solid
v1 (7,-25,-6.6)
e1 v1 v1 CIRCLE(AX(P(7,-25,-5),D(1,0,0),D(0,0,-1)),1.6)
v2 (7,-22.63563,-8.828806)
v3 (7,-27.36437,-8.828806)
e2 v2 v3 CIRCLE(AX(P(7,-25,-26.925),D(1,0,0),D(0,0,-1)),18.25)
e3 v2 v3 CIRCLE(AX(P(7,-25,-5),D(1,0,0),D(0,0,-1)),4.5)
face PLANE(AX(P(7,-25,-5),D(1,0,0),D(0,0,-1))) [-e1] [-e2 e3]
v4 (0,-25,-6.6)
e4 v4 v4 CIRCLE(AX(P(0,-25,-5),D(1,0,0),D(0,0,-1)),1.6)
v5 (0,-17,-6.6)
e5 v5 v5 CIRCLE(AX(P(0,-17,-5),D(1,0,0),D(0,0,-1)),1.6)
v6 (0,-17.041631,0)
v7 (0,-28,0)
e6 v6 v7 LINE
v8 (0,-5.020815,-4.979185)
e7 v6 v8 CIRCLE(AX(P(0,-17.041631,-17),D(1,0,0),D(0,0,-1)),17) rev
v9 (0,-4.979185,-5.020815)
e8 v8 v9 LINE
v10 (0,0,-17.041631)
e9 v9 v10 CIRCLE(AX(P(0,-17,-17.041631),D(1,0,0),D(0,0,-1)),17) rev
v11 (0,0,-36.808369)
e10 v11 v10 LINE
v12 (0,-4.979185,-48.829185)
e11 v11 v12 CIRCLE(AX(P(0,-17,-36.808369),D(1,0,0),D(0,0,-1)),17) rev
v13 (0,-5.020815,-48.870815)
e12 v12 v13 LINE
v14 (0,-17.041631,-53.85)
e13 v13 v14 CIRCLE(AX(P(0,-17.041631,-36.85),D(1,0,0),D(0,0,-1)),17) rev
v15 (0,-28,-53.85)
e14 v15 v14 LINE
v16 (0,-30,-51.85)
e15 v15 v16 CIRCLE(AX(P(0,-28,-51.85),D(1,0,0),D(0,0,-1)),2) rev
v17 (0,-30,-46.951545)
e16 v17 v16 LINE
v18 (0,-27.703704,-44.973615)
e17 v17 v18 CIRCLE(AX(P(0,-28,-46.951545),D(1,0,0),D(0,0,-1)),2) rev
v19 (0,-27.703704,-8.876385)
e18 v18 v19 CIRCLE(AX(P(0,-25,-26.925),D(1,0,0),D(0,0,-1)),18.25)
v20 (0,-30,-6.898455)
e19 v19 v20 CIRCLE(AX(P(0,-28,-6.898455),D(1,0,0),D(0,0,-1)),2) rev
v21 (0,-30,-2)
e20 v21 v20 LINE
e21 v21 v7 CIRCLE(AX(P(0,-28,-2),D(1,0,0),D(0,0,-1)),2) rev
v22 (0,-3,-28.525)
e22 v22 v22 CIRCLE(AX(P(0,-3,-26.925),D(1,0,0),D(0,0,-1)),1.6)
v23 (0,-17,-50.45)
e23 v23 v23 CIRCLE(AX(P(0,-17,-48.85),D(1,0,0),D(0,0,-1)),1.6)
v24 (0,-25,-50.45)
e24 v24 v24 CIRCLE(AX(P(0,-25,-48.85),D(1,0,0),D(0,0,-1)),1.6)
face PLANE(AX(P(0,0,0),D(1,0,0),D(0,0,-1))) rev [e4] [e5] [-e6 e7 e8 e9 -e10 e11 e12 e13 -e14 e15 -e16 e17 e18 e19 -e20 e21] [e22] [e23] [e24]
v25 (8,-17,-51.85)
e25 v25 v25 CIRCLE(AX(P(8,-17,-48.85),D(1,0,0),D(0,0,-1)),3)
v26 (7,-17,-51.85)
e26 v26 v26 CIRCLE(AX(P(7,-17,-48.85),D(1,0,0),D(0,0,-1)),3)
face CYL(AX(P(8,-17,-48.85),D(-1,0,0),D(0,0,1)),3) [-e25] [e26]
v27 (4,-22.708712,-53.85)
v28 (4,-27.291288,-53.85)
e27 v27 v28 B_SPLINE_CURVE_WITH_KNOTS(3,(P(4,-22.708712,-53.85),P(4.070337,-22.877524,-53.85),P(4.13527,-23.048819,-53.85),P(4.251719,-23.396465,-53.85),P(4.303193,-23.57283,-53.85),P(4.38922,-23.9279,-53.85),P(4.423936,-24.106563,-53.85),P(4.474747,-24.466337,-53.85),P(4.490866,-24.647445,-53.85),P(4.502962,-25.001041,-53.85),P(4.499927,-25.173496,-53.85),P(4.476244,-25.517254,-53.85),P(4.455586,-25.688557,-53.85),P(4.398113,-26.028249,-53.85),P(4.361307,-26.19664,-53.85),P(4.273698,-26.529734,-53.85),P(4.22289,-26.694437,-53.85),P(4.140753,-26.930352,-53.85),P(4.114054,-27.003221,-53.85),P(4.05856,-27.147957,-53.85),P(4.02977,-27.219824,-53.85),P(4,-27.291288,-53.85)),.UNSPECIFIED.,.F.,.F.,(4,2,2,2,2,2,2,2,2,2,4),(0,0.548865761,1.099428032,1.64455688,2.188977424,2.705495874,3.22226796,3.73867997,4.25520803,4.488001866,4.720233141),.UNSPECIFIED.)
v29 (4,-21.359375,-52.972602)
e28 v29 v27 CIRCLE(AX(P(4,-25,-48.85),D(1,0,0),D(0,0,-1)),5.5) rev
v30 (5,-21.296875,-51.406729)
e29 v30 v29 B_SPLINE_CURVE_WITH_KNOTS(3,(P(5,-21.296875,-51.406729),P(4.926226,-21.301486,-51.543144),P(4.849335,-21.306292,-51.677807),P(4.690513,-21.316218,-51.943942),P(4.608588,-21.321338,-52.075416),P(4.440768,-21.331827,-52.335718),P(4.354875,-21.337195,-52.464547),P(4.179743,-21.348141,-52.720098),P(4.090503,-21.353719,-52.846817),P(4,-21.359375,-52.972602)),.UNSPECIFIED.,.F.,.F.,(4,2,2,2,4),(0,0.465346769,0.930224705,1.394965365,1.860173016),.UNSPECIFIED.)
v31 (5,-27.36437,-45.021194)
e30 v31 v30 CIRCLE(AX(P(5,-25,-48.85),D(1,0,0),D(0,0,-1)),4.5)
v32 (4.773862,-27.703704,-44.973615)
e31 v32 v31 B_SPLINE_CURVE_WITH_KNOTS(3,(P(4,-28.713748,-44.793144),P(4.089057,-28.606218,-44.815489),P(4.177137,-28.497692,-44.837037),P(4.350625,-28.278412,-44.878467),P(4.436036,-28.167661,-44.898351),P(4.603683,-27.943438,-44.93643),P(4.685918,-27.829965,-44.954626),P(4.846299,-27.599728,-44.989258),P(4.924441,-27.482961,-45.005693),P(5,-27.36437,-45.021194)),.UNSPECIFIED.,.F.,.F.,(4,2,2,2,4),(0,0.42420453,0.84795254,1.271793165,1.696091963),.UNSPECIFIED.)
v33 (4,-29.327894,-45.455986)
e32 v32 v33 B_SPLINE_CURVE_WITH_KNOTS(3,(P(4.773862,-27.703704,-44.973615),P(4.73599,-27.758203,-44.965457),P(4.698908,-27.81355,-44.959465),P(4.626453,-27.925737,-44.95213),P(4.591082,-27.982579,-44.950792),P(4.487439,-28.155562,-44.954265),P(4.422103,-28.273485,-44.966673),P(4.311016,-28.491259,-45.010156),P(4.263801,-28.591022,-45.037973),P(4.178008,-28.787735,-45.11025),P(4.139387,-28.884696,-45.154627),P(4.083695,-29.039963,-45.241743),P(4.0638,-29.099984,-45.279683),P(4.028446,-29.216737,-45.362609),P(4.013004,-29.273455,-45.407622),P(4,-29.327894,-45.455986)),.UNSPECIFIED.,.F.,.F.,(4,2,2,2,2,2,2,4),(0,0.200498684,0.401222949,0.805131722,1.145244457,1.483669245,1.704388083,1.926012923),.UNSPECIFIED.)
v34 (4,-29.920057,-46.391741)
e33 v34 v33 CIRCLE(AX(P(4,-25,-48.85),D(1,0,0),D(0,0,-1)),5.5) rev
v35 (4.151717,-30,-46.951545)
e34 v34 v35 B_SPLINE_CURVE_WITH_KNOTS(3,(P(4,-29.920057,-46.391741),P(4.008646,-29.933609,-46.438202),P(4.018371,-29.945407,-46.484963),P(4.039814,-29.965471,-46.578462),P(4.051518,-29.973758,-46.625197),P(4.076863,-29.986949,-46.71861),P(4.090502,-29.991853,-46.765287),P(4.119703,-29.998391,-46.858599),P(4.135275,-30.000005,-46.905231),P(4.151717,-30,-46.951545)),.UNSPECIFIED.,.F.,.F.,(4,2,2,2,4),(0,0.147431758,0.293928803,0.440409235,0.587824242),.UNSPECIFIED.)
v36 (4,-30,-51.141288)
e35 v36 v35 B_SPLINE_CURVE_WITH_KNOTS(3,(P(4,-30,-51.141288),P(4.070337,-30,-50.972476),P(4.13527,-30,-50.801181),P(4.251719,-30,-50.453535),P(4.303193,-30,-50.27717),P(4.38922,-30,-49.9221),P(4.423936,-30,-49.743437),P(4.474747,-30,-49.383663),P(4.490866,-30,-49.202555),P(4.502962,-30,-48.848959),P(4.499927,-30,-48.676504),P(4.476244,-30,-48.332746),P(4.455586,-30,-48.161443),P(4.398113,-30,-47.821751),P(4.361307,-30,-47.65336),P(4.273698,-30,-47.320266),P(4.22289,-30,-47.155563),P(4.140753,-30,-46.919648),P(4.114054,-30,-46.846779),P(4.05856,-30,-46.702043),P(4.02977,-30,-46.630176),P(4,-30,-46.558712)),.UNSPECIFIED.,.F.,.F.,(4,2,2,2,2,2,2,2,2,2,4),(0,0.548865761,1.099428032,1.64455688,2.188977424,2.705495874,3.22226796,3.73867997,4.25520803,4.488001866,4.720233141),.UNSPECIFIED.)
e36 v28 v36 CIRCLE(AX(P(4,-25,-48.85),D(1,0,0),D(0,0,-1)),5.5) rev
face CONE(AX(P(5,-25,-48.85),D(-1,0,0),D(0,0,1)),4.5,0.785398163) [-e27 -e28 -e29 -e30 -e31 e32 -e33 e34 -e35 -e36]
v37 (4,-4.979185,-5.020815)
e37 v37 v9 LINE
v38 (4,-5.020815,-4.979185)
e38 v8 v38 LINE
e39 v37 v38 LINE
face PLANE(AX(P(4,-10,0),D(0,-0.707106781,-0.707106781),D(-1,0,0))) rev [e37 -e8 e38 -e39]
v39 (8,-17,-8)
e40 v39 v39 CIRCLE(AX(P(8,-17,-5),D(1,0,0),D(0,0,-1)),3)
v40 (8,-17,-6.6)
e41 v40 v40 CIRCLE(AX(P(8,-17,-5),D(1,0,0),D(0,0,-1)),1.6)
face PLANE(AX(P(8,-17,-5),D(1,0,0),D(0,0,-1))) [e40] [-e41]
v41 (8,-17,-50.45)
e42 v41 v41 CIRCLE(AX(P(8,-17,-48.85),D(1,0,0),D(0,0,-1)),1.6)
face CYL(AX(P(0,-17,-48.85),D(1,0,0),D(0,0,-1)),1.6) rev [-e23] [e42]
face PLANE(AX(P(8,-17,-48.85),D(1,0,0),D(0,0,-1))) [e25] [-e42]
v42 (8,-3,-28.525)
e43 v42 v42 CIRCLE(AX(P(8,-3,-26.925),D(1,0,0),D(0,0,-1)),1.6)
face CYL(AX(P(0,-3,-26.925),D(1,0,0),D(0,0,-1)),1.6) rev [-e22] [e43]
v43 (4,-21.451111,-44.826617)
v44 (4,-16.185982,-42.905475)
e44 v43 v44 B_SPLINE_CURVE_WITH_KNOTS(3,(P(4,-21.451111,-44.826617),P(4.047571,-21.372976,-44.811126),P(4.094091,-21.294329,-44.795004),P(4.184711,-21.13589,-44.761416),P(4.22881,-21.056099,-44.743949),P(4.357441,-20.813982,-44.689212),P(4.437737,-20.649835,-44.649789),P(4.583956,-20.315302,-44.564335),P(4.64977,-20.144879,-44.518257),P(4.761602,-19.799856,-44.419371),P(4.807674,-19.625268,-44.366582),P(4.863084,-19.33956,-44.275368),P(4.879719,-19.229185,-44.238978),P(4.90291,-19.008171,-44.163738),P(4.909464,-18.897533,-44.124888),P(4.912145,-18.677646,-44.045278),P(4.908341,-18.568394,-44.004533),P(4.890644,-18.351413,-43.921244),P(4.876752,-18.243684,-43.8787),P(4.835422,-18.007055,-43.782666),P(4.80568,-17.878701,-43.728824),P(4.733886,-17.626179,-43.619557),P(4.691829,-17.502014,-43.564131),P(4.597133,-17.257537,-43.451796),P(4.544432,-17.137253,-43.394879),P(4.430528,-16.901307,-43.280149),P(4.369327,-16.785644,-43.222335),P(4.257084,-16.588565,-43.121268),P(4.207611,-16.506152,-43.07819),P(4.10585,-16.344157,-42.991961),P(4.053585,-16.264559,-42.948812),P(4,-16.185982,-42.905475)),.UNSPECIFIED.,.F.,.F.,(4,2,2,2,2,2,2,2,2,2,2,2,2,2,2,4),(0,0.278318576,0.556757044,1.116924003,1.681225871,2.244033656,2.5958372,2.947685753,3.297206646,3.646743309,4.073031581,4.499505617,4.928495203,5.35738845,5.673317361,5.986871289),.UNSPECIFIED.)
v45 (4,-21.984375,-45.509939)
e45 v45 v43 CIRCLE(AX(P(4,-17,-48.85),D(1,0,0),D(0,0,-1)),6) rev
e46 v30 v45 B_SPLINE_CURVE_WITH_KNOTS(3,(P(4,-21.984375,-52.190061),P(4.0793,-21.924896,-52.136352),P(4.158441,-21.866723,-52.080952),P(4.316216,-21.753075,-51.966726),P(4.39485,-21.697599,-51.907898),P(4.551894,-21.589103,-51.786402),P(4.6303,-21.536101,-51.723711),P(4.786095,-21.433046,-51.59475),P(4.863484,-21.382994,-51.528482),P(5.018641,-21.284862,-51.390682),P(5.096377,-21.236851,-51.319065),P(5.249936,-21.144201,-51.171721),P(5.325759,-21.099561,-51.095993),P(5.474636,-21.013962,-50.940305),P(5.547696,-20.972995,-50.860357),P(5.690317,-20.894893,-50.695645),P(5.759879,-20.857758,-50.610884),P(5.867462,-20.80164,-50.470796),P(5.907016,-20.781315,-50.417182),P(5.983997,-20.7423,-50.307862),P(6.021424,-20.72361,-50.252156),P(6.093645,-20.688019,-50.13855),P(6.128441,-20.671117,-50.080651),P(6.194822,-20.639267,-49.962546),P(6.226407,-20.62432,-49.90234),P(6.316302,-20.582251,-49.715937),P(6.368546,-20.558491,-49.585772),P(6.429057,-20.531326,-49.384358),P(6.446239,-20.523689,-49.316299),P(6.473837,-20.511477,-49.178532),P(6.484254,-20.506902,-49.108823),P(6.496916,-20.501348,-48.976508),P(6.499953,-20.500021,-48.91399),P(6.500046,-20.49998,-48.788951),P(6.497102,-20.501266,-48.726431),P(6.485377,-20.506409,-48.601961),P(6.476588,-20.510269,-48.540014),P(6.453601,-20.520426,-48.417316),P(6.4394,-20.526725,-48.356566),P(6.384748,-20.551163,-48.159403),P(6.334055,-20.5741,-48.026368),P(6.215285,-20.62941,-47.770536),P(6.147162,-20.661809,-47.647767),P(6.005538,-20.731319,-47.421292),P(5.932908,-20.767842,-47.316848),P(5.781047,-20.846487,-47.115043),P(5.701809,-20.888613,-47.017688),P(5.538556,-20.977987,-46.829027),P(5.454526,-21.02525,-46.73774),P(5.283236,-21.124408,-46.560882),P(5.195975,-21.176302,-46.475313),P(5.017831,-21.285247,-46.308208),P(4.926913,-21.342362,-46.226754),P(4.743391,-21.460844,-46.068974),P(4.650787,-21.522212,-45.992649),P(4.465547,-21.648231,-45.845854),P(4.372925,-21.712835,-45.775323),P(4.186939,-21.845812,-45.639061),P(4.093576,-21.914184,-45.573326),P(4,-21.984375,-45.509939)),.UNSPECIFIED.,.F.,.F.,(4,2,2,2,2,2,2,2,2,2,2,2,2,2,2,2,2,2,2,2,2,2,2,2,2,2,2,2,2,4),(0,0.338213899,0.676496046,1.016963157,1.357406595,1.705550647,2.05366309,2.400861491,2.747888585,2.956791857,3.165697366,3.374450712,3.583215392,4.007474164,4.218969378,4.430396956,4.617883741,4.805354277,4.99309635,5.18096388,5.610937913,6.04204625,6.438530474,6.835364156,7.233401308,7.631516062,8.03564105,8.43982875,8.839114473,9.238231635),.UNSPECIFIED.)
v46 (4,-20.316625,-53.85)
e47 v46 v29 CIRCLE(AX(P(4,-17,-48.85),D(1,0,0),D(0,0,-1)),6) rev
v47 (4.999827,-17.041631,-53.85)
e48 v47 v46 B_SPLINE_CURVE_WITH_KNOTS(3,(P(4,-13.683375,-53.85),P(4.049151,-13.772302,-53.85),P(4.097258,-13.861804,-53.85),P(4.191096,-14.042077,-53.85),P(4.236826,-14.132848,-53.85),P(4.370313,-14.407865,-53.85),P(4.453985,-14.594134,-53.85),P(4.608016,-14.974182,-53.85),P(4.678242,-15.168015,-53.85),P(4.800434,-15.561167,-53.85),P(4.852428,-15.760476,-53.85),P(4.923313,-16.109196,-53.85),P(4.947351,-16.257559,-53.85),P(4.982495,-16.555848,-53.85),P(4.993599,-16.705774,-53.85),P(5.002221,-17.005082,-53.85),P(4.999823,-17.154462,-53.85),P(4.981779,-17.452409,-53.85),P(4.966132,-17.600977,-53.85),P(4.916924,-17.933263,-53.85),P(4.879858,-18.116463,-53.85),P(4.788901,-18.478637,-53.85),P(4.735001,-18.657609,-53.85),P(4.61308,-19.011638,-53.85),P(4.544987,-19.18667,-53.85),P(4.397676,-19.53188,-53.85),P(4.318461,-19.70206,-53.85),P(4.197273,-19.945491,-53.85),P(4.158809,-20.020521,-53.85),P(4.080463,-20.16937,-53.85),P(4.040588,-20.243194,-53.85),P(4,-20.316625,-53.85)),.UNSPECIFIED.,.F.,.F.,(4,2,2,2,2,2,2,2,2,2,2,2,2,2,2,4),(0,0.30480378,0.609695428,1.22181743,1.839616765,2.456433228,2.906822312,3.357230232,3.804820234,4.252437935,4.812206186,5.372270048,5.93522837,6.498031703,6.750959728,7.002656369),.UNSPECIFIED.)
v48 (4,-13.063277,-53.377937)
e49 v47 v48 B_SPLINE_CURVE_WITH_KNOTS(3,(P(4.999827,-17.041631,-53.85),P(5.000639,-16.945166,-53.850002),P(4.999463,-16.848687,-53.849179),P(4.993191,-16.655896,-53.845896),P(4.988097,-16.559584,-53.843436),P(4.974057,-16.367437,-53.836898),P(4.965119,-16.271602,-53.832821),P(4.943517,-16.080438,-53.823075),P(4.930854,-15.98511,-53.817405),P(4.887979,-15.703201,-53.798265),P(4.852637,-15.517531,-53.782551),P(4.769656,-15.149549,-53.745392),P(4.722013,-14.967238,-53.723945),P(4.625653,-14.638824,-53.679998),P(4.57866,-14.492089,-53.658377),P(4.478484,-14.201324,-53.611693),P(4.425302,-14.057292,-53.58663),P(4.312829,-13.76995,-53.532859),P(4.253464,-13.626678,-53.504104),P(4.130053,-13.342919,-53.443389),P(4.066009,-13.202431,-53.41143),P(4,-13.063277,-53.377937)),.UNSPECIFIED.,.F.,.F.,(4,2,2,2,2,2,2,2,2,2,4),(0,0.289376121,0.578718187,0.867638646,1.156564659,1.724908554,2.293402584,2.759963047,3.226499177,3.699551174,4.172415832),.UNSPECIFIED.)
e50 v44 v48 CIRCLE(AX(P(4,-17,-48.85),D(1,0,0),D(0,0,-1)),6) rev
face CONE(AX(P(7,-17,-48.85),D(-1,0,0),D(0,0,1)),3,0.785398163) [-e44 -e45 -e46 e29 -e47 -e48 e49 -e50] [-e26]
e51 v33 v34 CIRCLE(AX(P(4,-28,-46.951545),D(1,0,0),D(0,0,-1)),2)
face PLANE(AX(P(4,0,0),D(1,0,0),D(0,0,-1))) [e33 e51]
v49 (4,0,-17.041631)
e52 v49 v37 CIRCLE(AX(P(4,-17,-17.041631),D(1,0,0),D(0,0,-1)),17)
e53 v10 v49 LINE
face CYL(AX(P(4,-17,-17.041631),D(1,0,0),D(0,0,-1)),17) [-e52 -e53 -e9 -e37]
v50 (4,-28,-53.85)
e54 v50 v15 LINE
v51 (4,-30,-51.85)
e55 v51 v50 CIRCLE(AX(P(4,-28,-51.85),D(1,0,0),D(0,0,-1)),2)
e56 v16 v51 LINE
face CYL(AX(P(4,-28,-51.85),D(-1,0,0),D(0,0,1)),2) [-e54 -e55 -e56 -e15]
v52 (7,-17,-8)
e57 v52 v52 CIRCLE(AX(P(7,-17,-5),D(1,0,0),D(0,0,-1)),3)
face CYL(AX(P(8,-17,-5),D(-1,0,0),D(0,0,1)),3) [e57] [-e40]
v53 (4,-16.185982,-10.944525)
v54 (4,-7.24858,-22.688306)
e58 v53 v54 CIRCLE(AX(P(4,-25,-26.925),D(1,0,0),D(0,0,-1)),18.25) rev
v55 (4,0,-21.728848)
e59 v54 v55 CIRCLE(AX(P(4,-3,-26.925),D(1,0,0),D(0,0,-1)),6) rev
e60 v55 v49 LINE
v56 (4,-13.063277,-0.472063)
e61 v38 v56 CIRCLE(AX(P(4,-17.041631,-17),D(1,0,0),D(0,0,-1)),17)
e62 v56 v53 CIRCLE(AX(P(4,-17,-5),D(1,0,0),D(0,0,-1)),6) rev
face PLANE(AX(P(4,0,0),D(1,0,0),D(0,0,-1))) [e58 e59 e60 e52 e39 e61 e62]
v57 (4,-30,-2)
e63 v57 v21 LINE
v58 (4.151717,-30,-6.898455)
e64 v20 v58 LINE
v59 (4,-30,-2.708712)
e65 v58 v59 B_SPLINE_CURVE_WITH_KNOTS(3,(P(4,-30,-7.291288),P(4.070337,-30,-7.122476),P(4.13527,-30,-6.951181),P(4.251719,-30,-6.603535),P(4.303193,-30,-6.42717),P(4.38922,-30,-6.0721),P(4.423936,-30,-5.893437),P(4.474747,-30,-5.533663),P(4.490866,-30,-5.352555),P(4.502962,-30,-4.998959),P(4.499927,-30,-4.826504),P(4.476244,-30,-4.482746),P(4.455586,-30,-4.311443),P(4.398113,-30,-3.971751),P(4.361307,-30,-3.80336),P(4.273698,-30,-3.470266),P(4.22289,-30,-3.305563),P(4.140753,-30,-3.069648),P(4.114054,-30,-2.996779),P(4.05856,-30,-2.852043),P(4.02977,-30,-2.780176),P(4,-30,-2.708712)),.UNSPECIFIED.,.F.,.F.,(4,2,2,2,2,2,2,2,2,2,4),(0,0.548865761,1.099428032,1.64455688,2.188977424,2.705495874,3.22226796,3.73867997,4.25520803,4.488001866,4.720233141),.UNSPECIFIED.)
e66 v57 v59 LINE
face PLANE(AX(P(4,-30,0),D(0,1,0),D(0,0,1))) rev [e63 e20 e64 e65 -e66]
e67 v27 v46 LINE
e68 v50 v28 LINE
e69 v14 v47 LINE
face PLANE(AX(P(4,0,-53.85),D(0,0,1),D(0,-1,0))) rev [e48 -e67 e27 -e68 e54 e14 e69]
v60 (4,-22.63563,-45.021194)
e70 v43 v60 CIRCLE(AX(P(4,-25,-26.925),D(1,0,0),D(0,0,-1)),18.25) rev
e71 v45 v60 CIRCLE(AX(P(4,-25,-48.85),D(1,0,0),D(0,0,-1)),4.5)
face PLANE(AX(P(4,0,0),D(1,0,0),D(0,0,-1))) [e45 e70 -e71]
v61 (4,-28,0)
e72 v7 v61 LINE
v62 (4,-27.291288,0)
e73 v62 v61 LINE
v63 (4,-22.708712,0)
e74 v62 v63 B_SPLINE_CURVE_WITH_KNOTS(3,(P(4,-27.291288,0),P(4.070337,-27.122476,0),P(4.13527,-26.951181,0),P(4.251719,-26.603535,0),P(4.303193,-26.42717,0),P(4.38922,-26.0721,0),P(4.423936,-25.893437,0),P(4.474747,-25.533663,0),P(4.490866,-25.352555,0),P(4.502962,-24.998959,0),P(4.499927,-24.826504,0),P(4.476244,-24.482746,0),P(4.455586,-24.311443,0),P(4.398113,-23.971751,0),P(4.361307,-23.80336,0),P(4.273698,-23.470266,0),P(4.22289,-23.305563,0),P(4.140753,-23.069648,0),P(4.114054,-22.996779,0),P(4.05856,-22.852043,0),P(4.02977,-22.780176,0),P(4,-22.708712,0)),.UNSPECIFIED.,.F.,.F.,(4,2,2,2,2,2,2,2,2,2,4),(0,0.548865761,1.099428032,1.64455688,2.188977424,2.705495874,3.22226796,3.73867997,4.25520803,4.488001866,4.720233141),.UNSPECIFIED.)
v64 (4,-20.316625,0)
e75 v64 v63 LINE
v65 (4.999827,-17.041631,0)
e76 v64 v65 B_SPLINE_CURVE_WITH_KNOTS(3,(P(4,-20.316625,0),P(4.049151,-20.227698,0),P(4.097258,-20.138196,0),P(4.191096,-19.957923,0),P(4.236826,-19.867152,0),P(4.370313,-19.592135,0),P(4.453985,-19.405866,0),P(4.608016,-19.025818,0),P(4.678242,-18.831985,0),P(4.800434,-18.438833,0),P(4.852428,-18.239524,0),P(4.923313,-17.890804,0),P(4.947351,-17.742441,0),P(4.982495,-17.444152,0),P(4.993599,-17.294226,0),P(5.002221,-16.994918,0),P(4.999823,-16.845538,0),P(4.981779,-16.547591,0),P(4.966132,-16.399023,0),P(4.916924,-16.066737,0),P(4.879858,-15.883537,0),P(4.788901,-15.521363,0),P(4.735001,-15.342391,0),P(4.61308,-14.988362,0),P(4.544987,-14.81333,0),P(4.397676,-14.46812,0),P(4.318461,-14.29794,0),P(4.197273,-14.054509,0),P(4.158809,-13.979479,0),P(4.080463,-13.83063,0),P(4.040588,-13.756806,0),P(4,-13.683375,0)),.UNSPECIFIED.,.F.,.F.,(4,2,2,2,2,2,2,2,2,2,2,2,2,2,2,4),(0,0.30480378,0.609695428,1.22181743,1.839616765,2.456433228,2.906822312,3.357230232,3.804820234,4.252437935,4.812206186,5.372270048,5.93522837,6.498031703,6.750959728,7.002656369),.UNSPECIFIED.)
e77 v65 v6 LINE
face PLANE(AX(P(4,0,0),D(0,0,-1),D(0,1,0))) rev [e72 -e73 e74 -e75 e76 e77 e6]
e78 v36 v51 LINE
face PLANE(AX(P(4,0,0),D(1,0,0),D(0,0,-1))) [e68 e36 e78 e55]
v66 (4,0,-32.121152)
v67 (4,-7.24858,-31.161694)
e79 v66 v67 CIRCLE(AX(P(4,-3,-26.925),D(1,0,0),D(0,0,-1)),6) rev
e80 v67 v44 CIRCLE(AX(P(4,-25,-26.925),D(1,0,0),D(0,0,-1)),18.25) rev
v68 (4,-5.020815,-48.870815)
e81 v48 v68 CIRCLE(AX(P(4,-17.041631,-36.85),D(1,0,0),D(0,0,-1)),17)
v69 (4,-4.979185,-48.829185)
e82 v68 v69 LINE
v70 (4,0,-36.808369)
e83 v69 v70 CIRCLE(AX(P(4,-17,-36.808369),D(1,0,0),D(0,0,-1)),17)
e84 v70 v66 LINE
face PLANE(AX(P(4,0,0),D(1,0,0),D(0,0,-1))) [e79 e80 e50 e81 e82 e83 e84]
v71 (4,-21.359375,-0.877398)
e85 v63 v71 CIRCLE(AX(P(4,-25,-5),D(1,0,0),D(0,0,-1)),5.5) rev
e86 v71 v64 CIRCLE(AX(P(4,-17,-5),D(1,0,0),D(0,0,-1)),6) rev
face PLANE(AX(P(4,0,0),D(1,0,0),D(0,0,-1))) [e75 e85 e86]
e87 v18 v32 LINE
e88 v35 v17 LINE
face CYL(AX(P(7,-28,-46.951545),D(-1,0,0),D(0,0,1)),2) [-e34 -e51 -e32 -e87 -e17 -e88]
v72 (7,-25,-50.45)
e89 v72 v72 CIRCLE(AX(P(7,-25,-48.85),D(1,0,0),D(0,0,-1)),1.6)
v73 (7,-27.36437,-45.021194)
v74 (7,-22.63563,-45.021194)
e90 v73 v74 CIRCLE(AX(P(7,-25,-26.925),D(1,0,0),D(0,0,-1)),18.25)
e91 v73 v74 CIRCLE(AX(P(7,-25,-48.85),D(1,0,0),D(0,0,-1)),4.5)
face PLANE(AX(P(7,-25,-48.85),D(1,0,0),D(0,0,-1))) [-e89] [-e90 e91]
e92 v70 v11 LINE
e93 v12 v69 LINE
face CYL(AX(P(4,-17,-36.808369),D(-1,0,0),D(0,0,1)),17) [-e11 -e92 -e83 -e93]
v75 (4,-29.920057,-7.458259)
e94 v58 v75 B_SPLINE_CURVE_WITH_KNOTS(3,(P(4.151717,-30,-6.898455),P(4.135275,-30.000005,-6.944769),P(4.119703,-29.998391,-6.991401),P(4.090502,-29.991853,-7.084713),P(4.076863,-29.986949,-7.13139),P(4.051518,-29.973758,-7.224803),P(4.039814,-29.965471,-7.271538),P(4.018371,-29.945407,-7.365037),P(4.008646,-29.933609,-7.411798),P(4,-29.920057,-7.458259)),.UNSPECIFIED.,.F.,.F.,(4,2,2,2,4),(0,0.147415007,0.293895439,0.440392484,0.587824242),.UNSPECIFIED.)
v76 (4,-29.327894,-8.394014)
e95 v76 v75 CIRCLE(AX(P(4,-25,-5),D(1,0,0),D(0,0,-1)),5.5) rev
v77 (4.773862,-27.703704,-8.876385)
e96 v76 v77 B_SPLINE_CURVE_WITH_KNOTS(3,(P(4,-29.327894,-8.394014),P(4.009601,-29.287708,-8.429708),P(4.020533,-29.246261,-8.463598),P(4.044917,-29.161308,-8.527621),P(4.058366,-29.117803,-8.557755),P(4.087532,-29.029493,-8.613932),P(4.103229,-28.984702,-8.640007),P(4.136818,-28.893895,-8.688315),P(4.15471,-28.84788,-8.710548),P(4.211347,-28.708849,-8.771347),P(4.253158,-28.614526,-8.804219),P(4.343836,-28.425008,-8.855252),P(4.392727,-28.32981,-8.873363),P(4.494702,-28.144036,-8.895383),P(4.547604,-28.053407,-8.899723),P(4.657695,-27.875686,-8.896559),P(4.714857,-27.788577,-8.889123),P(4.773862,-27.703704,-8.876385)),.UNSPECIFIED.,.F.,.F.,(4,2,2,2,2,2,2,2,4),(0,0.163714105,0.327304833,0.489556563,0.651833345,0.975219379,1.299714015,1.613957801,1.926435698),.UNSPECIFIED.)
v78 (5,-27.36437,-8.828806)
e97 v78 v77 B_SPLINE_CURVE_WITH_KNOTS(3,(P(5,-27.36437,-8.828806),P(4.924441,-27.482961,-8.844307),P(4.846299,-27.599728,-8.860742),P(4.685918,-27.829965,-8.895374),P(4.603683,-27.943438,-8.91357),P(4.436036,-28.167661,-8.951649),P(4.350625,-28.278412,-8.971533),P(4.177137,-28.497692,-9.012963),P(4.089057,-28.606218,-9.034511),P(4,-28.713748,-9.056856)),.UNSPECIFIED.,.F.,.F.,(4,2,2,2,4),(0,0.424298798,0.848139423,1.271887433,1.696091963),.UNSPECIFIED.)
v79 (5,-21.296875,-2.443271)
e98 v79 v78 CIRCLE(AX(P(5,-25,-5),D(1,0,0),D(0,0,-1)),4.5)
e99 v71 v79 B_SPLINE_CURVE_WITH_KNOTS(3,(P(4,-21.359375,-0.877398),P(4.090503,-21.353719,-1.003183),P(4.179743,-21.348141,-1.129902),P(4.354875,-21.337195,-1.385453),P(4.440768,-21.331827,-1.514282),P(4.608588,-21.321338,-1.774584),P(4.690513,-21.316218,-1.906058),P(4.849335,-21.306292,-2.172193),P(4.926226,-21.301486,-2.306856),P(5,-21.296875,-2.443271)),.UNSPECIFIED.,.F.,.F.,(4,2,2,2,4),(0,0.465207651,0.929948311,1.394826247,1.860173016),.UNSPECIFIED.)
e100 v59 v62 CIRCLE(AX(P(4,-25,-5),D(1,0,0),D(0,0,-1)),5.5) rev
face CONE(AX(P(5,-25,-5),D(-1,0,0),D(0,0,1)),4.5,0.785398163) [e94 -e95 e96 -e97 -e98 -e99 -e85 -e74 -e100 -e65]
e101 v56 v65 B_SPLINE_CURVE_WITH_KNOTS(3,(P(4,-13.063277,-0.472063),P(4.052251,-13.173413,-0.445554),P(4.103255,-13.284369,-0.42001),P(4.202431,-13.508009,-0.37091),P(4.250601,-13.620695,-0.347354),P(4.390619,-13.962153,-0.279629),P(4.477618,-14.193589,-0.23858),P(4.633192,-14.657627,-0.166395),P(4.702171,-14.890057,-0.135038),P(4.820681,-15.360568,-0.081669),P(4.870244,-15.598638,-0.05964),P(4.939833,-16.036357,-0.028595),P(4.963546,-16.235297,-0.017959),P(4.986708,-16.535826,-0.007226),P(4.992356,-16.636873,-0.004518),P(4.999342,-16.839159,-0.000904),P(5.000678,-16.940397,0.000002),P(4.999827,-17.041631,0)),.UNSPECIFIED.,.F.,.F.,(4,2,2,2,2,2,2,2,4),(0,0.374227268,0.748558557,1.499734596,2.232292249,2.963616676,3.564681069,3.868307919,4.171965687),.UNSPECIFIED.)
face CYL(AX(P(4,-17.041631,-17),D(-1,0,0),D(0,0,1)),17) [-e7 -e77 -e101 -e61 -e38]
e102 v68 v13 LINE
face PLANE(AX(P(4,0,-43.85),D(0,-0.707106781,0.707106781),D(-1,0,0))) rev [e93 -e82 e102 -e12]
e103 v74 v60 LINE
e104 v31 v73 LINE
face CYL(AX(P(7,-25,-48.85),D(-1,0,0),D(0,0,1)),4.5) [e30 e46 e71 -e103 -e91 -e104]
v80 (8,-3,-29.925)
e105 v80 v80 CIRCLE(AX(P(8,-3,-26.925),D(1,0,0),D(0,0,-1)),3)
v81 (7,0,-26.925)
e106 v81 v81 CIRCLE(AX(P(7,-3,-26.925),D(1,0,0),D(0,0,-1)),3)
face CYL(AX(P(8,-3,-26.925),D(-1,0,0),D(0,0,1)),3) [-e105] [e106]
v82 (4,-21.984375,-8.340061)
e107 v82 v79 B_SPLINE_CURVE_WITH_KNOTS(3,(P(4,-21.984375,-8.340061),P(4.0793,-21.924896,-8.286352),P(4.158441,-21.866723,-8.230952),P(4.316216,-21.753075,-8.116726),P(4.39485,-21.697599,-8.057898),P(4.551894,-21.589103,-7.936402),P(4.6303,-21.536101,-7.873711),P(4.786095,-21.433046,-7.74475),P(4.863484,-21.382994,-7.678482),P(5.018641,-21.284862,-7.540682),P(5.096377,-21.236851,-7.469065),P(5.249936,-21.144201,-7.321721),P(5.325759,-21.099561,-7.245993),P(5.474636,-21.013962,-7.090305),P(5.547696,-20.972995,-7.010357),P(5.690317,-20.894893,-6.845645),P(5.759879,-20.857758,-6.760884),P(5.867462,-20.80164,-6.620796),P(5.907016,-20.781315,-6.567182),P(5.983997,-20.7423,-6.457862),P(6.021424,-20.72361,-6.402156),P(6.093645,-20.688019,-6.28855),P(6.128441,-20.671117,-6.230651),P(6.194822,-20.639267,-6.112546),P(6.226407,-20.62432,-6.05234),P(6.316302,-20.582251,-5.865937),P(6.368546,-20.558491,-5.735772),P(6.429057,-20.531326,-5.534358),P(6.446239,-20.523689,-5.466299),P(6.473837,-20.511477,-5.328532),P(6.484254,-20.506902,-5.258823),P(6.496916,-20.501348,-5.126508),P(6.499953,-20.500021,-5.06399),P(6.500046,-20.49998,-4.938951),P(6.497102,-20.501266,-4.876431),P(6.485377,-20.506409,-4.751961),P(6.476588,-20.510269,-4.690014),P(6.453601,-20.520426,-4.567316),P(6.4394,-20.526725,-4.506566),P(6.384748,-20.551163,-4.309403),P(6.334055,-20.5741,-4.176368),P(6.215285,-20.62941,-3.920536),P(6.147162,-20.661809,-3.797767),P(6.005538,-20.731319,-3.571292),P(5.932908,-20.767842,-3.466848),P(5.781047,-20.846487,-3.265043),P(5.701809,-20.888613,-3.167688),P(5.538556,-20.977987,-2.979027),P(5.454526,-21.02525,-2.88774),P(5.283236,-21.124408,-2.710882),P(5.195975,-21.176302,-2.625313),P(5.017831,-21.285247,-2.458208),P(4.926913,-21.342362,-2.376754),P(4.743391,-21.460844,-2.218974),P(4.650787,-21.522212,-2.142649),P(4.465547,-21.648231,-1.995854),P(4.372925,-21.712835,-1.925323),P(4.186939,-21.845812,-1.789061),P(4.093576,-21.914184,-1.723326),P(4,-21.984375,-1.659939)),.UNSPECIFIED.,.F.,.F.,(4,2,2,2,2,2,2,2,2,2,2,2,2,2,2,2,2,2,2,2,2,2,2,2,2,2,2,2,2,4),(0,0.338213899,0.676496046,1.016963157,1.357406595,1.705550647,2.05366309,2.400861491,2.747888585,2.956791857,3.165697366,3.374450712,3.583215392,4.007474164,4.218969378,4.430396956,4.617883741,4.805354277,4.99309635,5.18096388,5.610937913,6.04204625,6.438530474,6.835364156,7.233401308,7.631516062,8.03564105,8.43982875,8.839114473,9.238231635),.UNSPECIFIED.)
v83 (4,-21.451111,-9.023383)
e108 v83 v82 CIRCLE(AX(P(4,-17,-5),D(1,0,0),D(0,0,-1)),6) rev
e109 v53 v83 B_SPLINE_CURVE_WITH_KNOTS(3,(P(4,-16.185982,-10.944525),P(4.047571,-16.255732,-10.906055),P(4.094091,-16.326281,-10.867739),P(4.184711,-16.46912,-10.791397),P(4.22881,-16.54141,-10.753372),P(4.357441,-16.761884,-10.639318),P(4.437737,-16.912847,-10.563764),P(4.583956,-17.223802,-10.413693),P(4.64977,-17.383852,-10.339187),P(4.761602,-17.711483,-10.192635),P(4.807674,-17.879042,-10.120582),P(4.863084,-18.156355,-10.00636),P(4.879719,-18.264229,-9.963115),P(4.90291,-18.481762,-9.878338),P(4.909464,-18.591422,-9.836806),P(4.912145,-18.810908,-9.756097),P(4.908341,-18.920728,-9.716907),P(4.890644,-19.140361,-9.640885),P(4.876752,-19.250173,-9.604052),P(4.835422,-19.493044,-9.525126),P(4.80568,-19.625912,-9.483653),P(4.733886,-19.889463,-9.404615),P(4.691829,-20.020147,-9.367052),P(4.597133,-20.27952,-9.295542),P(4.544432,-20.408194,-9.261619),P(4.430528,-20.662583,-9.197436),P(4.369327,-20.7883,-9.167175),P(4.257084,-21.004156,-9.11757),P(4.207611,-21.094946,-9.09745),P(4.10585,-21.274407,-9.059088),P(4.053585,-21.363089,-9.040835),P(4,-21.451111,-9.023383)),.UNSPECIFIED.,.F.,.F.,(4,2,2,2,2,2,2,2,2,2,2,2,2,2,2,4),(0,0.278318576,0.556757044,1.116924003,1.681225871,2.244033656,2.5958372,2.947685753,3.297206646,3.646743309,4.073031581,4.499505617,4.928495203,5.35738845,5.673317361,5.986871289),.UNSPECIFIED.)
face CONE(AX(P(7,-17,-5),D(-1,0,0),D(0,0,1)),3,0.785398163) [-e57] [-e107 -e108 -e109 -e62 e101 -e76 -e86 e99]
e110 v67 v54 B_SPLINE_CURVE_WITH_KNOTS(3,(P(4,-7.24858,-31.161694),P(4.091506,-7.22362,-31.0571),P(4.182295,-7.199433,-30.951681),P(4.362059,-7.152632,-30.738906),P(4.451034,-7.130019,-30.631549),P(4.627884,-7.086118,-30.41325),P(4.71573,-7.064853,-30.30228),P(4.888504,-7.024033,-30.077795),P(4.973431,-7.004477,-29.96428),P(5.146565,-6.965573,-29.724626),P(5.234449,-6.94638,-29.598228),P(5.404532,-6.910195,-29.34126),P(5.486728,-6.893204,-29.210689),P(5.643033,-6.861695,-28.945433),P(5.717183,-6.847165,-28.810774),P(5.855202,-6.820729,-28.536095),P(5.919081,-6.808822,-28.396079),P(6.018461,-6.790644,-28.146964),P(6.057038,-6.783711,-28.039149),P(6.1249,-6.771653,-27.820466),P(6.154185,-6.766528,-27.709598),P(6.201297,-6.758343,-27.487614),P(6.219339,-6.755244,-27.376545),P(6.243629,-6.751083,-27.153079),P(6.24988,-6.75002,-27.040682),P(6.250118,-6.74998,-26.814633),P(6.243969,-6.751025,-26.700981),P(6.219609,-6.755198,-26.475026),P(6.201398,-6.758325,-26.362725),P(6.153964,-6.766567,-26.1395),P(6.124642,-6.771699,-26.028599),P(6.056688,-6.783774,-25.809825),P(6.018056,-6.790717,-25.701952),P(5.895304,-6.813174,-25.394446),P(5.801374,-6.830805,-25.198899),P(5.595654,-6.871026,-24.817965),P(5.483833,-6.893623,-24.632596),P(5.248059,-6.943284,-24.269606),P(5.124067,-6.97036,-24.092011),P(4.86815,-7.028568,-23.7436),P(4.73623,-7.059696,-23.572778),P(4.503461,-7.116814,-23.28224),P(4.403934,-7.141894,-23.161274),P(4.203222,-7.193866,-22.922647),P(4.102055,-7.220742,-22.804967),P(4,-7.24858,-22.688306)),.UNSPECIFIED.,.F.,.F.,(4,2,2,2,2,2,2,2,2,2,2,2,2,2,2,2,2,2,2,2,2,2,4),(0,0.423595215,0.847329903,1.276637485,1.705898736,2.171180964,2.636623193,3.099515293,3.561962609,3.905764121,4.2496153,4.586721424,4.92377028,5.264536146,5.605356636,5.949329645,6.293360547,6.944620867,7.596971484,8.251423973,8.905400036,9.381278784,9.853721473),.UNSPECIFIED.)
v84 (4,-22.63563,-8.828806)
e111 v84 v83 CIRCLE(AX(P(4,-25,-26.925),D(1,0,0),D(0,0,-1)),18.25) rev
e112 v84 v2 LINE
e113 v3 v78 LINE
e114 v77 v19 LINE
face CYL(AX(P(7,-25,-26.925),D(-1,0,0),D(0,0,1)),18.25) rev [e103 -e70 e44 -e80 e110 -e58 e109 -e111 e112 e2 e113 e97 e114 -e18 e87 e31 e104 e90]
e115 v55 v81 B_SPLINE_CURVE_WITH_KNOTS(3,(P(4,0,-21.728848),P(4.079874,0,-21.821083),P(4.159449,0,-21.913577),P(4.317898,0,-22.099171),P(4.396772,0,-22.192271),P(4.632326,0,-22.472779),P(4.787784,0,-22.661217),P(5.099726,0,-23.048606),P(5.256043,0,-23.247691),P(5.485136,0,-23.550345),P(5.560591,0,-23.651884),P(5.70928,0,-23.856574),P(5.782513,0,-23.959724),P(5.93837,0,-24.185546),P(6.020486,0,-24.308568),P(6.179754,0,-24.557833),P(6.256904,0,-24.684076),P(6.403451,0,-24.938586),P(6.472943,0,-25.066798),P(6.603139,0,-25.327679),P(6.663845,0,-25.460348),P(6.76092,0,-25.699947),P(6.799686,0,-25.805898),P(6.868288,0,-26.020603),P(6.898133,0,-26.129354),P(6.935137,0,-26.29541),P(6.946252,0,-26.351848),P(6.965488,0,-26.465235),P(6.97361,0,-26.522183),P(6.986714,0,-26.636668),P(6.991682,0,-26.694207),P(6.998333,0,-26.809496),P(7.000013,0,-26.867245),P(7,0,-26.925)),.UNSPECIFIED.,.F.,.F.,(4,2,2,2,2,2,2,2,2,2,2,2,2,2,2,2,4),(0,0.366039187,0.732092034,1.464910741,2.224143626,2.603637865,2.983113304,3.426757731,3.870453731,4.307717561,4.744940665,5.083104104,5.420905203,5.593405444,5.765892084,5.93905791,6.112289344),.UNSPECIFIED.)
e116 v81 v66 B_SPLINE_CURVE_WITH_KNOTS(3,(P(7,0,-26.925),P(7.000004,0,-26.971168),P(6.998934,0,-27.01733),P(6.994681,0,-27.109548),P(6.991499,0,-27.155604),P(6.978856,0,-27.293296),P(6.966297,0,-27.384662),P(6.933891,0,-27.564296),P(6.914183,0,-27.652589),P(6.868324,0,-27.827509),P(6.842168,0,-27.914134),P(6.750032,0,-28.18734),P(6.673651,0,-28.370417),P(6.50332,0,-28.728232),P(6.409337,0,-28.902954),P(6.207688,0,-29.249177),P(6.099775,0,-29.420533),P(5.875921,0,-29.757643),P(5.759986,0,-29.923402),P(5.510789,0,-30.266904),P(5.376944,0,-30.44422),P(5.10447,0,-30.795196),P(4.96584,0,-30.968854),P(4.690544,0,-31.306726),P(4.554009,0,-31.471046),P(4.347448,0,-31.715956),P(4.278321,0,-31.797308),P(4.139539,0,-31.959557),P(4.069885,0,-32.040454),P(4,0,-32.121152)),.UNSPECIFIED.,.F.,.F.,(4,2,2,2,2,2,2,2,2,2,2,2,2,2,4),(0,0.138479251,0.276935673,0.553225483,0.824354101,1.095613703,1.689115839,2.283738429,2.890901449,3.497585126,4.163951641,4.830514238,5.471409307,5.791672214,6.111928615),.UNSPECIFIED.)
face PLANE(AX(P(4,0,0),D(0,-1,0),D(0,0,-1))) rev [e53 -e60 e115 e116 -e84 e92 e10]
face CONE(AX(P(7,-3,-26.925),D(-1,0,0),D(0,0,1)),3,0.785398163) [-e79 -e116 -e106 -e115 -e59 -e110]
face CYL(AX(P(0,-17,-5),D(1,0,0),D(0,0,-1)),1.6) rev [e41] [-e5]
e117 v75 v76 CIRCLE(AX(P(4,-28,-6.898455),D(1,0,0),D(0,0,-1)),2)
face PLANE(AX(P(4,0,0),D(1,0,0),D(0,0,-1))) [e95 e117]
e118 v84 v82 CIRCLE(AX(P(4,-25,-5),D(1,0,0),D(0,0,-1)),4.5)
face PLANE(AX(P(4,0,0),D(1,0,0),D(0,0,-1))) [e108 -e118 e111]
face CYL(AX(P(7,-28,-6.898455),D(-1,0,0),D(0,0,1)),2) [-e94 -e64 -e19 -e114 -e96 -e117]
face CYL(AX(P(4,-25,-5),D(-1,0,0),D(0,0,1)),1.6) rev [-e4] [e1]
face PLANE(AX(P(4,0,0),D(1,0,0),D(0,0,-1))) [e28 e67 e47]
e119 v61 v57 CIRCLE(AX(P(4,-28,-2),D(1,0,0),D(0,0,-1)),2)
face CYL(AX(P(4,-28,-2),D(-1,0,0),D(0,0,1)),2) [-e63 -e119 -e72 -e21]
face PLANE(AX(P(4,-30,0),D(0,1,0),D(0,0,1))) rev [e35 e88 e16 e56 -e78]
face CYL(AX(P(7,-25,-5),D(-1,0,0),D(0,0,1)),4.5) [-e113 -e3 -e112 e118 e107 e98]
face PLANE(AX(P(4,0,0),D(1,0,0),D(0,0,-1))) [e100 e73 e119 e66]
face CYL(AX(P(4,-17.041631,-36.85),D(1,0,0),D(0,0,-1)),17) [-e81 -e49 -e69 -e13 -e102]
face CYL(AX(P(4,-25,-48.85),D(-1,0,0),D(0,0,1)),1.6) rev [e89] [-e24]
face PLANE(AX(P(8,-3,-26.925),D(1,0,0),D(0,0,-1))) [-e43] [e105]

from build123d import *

# Parameters (mm, degrees)
SKETCH_1_W               = 53.85
SKETCH_1_H               = 30
SKETCH_1_R               = 1.6
EXTRUDE_1_DEPTH          = 4
SKETCH_7_R               = 4.5
SKETCH_7_R_2             = 1.6
EXTRUDE_3_DEPTH          = 3
CUT_EXTRUDE_1_DEPTH      = 62.772344136
CUT_EXTRUDE_1_DEPTH_BACK = 4
SKETCH_2_R               = 18.25
CHAMFER_1_SIZE           = 10
SKETCH_3_R               = 3
EXTRUDE_2_DEPTH          = 4
SKETCH_4_R               = 1.6
CUT_EXTRUDE_2_DEPTH      = 63.159653313
CHAMFER_3_SIZE           = 3
CHAMFER_4_SIZE           = 1
FILLET_1_R               = 2
FILLET_2_R               = 17


with BuildPart() as part:
    # 草图1 → 凸台-拉伸1 (new body)
    with BuildSketch(Plane(origin=(0, 0, 0), x_dir=(0, 0, -1), z_dir=(1, 0, 0))):
        with Locations((26.925, -15)):
            Rectangle(SKETCH_1_W, SKETCH_1_H)
        with Locations((5, -25)):
            Circle(SKETCH_1_R, mode=Mode.SUBTRACT)
        with Locations((48.85, -25)):
            Circle(SKETCH_1_R, mode=Mode.SUBTRACT)
    extrude(amount=EXTRUDE_1_DEPTH)

    # 草图7 → 凸台-拉伸3 (add)
    # profile 1 of 2: a face of its own
    with BuildSketch(Plane(origin=(4, 0, 0), x_dir=(0, 0, -1), z_dir=(1, 0, 0))):
        with Locations((5, -25)):
            Circle(SKETCH_7_R)
        with Locations((5, -25)):
            Circle(SKETCH_7_R_2, mode=Mode.SUBTRACT)
    # profile 2 of 2: a face of its own
    with BuildSketch(Plane(origin=(4, 0, 0), x_dir=(0, 0, -1), z_dir=(1, 0, 0))):
        with Locations((48.85, -25)):
            Circle(SKETCH_7_R)
        with Locations((48.85, -25)):
            Circle(SKETCH_7_R_2, mode=Mode.SUBTRACT)
    extrude(amount=EXTRUDE_3_DEPTH)

    # 草图2 → 切除-拉伸1 (cut, two sides: drawn at the far end of the back side and taken through both)
    with BuildSketch(Plane(origin=(4, 0, 0), x_dir=(0, 0, -1), z_dir=(1, 0, 0)).offset(-CUT_EXTRUDE_1_DEPTH_BACK)):
        with Locations((26.925, -25)):
            Circle(SKETCH_2_R)
    extrude(amount=CUT_EXTRUDE_1_DEPTH + CUT_EXTRUDE_1_DEPTH_BACK, mode=Mode.SUBTRACT)

    # 倒角1
    chamfer_1_edges = [part.edges().sort_by_distance(p)[0] for p in [
        (2, 0, 0),
        (2, 0, -53.85),
    ]]
    chamfer(chamfer_1_edges, length=CHAMFER_1_SIZE)

    # 草图3 → 凸台-拉伸2 (add)
    with BuildSketch(Plane(origin=(4, 0, 0), x_dir=(0, 0, -1), z_dir=(1, 0, 0))):
        with Locations((5, -17)):
            Circle(SKETCH_3_R)
        with Locations((48.85, -17)):
            Circle(SKETCH_3_R)
        with Locations(Location((26.925, -3, 0), (0, 0, 90))):
            Circle(SKETCH_3_R)
    extrude(amount=EXTRUDE_2_DEPTH)

    # 草图4 → 切除-拉伸2 (cut, through all)
    with BuildSketch(Plane(origin=(8, 0, 0), x_dir=(0, 0, -1), z_dir=(1, 0, 0))):
        with Locations((5, -17)):
            Circle(SKETCH_4_R)
        with Locations((48.85, -17)):
            Circle(SKETCH_4_R)
        with Locations((26.925, -3)):
            Circle(SKETCH_4_R)
    extrude(amount=-CUT_EXTRUDE_2_DEPTH, mode=Mode.SUBTRACT)

    # 倒角3
    # the kernel refuses this chamfer: 3 mm, written as the material it adds along each edge
    with BuildSketch(Plane(origin=(4, -17, -5), x_dir=(0, 0, -1), z_dir=(0, -1, 0))) as chamfer_3_piece_1_section:
        Polygon((3 + CHAMFER_3_SIZE, 0), (3, CHAMFER_3_SIZE), (3, 0), align=None)
    chamfer_3_piece_1 = revolve(axis=Axis((4, -17, -5), (1, 0, 0)), mode=Mode.PRIVATE)
    chamfer_3_piece_1 = split(chamfer_3_piece_1, bisect_by=Plane(origin=(5.467307701, -17, 0), z_dir=(0, 0, -1)), keep=Keep.TOP, mode=Mode.PRIVATE)
    chamfer_3_piece_1 = chamfer_3_piece_1 - Plane(origin=(5.467307701, -25, -26.925), x_dir=(0, 0, -1), z_dir=(1, 0, 0)) * Cylinder(18.25, 25, mode=Mode.PRIVATE)
    with BuildSketch(Plane(origin=(4, -17, -48.85), x_dir=(0, 0, -1), z_dir=(0, -1, 0))) as chamfer_3_piece_2_section:
        Polygon((3 + CHAMFER_3_SIZE, 0), (3, CHAMFER_3_SIZE), (3, 0), align=None)
    chamfer_3_piece_2 = revolve(axis=Axis((4, -17, -48.85), (1, 0, 0)), mode=Mode.PRIVATE)
    chamfer_3_piece_2 = chamfer_3_piece_2 - Plane(origin=(5.467307729, -25, -26.925), x_dir=(0, 0, -1), z_dir=(1, 0, 0)) * Cylinder(18.25, 24, mode=Mode.PRIVATE)
    chamfer_3_piece_2 = split(chamfer_3_piece_2, bisect_by=Plane(origin=(5.467307729, -17, -53.85), z_dir=(0, 0, 1)), keep=Keep.TOP, mode=Mode.PRIVATE)
    with BuildSketch(Plane(origin=(4, -3, -26.925), x_dir=(0, 1, 0), z_dir=(0, 0, -1))) as chamfer_3_piece_3_section:
        Polygon((3 + CHAMFER_3_SIZE, 0), (3, CHAMFER_3_SIZE), (3, 0), align=None)
    chamfer_3_piece_3 = revolve(axis=Axis((4, -3, -26.925), (1, 0, 0)), mode=Mode.PRIVATE)
    chamfer_3_piece_3 = split(chamfer_3_piece_3, bisect_by=Plane(origin=(4.469931391, 0, -22.187900458), z_dir=(0, -1, 0)), keep=Keep.TOP, mode=Mode.PRIVATE)
    chamfer_3_piece_3 = chamfer_3_piece_3 - Plane(origin=(4.469931391, -25, -26.925), x_dir=(0, 0, -1), z_dir=(1, 0, 0)) * Cylinder(18.25, 24, mode=Mode.PRIVATE)
    add([chamfer_3_piece_1, chamfer_3_piece_2, chamfer_3_piece_3])

    # 倒角4
    # the kernel refuses this chamfer: 1 mm, written as the material it adds along each edge
    with BuildSketch(Plane(origin=(4, -25, -48.85), x_dir=(0, 0.9653833924151701, -0.26083501614809607), z_dir=(0, 0.26083501614809607, 0.9653833924151701))) as chamfer_4_piece_1_section:
        Polygon((4.5, -CHAMFER_4_SIZE), (4.5 + CHAMFER_4_SIZE, 0), (4.5, 0), align=None)
    chamfer_4_piece_1 = revolve(axis=Axis((4, -25, -48.85), (-1, 0, 0)), revolution_arc=255.986755494, mode=Mode.PRIVATE)
    chamfer_4_piece_1 = chamfer_4_piece_1 - Plane(origin=(4.294296116, -25, -26.925), x_dir=(0, 0, -1), z_dir=(1, 0, 0)) * Cylinder(18.25, 22, mode=Mode.PRIVATE)
    chamfer_4_piece_1 = split(chamfer_4_piece_1, bisect_by=Plane(origin=(4.294296116, -30, -51.249638495), z_dir=(0, 1, 0)), keep=Keep.TOP, mode=Mode.PRIVATE)
    chamfer_4_piece_1 = split(chamfer_4_piece_1, bisect_by=Plane(origin=(4.294296116, -20.838072268, -53.85), z_dir=(0, 0, 1)), keep=Keep.TOP, mode=Mode.PRIVATE)
    add(chamfer_4_piece_1)
    with BuildSketch(Plane(origin=(4, -25, -5), x_dir=(0, 0.9653833924151692, 0.26083501614809945), z_dir=(0, 0.26083501614809945, -0.9653833924151692))) as chamfer_4_piece_2_section:
        Polygon((4.5, CHAMFER_4_SIZE), (4.5 + CHAMFER_4_SIZE, 0), (4.5, 0), align=None)
    chamfer_4_piece_2 = revolve(axis=Axis((4, -25, -5), (1, 0, 0)), revolution_arc=255.986755494, mode=Mode.PRIVATE)
    chamfer_4_piece_2 = chamfer_4_piece_2 - Plane(origin=(4.294296117, -25, -26.925), x_dir=(0, 0, -1), z_dir=(1, 0, 0)) * Cylinder(18.25, 22, mode=Mode.PRIVATE)
    chamfer_4_piece_2 = split(chamfer_4_piece_2, bisect_by=Plane(origin=(4.294296117, -30, -2.600361506), z_dir=(0, 1, 0)), keep=Keep.TOP, mode=Mode.PRIVATE)
    chamfer_4_piece_2 = split(chamfer_4_piece_2, bisect_by=Plane(origin=(4.294296117, -20.838072268, 0), z_dir=(0, 0, -1)), keep=Keep.TOP, mode=Mode.PRIVATE)
    add(chamfer_4_piece_2)

    # 圆角1
    # the kernel refuses this fillet: 2 mm, written as the material it takes off along each edge
    with BuildSketch(Plane(origin=(-6.187088914, -30, -9.373290682), x_dir=(0, 0, 1), z_dir=(1, 0, 0))) as fillet_1_piece_1:
        with BuildLine():
            CenterArc((2.474835566, -2), FILLET_1_R, 90, 98.519624254)
            ThreePointArc((0.496905207, -2.296296296), (0.285443162, -1.140143606), (0, 0))
            Line((0, 0), (2.474835566, 0))
        make_face()
    extrude(amount=16.374177829, mode=Mode.SUBTRACT)
    with BuildSketch(Plane(origin=(-6.187088914, -30, -44.476709318), x_dir=(0, 0.977378218113637, -0.21149898051057317), z_dir=(1, 0, 0))) as fillet_1_piece_2:
        with BuildLine():
            CenterArc((2.478181635, -1.995852414), FILLET_1_R, 93.690586551, 98.519624254)
            Line((0.523425199, -2.418850375), (0, 0))
            ThreePointArc((0, 0), (1.174722463, -0.037846719), (2.349444927, 0))
        make_face()
    extrude(amount=16.374177829, mode=Mode.SUBTRACT)
    with BuildSketch(Plane(origin=(-5, -30, -53.85), x_dir=(0, 0, 1), z_dir=(1, 0, 0)), Plane(origin=(-5, -30, 0), x_dir=(0, 1, 0), z_dir=(1, 0, 0))) as fillet_1_piece_3:
        with BuildLine():
            CenterArc((FILLET_1_R, -FILLET_1_R), FILLET_1_R, 90, 90)
            Line((0, -FILLET_1_R), (0, 0))
            Line((0, 0), (FILLET_1_R, 0))
        make_face()
    extrude(amount=14, mode=Mode.SUBTRACT)

    # 圆角2
    # the kernel refuses this fillet: 17 mm, written as the material it takes off along each edge
    with BuildSketch(Plane(origin=(-17.604076401, -10, -53.85), x_dir=(0, -1, 0), z_dir=(1, 0, 0))) as fillet_2_piece_1:
        with BuildLine():
            CenterArc((FILLET_2_R * 0.414213562373, -FILLET_2_R), FILLET_2_R, 90, 45)
            Line((-FILLET_2_R * 0.292893218813, -FILLET_2_R * 0.292893218813), (0, 0))
            Line((0, 0), (FILLET_2_R * 0.414213562373, 0))
        make_face()
    extrude(amount=39.208152802, mode=Mode.SUBTRACT)
    with BuildSketch(Plane(origin=(-17.604076401, 0, -43.85), x_dir=(0, 0, 1), z_dir=(1, 0, 0)), Plane(origin=(-17.604076401, -10, 0), x_dir=(0, -1, 0), z_dir=(1, 0, 0)), Plane(origin=(-17.604076401, 0, -10), x_dir=(0, -0.7071067811865477, 0.7071067811865474), z_dir=(1, 0, 0))) as fillet_2_piece_2:
        with BuildLine():
            CenterArc((FILLET_2_R * 0.414213562373, FILLET_2_R), FILLET_2_R, 225, 45)
            Line((-FILLET_2_R * 0.292893218813, FILLET_2_R * 0.292893218813), (0, 0))
            Line((0, 0), (FILLET_2_R * 0.414213562373, 0))
        make_face()
    extrude(amount=39.208152802, mode=Mode.SUBTRACT)


solid = part.part
